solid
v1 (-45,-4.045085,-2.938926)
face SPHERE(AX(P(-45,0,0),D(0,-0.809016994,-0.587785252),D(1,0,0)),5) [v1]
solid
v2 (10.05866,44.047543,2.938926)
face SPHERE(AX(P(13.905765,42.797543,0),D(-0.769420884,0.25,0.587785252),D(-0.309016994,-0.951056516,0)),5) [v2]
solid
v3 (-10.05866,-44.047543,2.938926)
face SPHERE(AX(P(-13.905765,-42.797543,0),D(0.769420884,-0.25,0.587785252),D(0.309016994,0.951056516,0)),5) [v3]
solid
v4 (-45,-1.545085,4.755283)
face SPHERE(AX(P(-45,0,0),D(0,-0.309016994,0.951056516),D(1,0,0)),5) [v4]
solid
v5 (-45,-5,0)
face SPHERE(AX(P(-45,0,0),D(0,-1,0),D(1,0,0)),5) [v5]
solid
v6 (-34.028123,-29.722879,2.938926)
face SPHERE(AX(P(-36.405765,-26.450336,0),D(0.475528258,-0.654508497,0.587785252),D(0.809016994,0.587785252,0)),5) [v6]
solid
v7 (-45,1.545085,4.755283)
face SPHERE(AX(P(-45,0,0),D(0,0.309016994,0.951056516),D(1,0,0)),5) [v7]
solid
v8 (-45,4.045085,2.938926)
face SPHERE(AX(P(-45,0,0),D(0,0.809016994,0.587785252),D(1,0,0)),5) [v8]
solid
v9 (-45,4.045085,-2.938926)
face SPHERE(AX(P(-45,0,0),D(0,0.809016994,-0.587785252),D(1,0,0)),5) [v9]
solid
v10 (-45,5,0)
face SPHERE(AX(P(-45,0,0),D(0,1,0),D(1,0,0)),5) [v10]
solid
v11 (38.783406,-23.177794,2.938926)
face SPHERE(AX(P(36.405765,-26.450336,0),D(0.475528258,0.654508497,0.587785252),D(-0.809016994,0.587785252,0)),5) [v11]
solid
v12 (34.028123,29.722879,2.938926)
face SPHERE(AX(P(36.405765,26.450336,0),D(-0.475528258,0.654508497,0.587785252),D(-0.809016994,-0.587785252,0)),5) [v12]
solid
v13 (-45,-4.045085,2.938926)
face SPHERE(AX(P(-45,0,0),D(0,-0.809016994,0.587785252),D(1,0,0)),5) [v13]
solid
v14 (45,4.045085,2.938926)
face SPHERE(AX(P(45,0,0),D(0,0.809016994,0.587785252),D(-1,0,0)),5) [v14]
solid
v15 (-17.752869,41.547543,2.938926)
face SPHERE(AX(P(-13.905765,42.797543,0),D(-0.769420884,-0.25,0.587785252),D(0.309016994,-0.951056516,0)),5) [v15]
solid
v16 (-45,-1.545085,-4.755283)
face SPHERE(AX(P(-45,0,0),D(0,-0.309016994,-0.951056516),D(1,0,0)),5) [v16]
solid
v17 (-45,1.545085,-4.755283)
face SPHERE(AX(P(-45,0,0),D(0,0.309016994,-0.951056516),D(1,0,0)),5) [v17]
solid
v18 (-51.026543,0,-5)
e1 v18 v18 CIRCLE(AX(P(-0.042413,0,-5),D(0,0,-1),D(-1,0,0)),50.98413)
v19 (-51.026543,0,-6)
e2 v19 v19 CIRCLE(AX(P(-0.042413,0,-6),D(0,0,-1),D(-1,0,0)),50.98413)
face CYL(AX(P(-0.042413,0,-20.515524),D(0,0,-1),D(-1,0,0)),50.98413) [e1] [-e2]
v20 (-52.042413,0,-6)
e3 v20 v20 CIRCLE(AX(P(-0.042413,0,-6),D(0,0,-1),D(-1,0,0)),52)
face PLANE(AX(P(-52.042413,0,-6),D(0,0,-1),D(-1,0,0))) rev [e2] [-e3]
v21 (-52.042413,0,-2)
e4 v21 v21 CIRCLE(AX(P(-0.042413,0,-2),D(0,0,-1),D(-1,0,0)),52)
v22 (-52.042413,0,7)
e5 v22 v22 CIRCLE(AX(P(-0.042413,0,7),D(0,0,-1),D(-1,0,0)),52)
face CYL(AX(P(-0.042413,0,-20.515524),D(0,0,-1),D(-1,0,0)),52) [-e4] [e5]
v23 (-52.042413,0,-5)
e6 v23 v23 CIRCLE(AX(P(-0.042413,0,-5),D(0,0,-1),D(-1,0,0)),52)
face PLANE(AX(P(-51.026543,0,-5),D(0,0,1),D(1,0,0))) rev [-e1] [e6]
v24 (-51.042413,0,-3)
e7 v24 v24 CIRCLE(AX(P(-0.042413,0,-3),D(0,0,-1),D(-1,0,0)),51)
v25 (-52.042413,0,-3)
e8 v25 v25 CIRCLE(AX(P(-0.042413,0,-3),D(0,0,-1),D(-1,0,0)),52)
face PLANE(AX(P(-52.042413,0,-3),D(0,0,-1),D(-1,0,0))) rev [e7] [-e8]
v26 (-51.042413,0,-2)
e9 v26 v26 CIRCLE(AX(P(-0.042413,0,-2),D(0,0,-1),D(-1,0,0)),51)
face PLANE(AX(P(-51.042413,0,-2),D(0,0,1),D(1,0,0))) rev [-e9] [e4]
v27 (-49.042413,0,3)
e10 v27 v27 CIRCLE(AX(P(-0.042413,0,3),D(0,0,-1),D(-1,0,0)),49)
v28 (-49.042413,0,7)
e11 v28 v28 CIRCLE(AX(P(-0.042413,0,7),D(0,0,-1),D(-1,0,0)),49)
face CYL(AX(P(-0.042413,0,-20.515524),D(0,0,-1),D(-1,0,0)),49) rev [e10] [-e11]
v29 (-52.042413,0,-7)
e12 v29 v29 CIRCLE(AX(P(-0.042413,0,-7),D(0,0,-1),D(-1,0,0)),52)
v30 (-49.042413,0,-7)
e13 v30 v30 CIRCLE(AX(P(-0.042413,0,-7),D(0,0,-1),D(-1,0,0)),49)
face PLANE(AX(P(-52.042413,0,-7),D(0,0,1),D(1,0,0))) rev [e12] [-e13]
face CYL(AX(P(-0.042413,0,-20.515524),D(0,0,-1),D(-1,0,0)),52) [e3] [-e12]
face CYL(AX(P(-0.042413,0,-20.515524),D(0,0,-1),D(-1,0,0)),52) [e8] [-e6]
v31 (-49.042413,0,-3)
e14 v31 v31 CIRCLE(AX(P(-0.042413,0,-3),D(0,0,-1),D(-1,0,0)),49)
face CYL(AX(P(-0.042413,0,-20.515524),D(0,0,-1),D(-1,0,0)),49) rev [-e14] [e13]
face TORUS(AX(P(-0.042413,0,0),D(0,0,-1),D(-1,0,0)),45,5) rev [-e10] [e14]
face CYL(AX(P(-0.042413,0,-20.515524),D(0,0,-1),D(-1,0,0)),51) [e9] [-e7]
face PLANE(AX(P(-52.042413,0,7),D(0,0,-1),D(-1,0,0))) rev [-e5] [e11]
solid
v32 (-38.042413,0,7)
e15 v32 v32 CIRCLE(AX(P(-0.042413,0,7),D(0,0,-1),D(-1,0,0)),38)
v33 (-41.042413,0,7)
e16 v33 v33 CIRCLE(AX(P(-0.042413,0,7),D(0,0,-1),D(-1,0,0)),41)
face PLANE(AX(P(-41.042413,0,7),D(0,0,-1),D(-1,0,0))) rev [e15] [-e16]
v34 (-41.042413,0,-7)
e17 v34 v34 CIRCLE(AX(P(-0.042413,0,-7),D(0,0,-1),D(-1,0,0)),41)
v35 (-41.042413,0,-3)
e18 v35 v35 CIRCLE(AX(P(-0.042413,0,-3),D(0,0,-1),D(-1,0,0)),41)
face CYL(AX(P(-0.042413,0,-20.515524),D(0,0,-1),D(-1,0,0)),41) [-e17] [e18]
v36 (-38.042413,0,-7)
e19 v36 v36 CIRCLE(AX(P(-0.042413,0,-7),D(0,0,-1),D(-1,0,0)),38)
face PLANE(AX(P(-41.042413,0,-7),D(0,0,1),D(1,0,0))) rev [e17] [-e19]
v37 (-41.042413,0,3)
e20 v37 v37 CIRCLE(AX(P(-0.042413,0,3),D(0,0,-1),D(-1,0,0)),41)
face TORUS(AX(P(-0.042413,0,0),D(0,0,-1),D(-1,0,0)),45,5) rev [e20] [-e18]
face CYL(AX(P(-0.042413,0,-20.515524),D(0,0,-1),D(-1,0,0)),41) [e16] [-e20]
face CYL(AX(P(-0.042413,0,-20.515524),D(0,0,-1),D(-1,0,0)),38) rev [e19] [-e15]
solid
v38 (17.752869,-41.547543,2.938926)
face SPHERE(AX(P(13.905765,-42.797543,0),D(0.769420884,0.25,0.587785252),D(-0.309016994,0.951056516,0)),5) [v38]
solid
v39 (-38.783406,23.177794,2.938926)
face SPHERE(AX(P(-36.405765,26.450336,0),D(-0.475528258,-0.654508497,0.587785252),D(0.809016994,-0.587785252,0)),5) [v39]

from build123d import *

# Parameters (mm, degrees)
CIRPATTERN1_COUNT   = 10
CIRPATTERN2_ANGLE   = 180
CIRPATTERN2_2_ANGLE = 180
CIRPATTERN2_3_ANGLE = 180
CIRPATTERN2_4_ANGLE = 180
CIRPATTERN2_5_ANGLE = 180
CIRPATTERN2_6_ANGLE = 180
CIRPATTERN2_7_ANGLE = 180
CIRPATTERN2_8_ANGLE = 180
CIRPATTERN2_9_ANGLE = 180


with BuildPart() as part:
    # Sketch2 → Revolve1 (revolve)
    with BuildSketch(Plane.XZ):
        with BuildLine():
            Line((-52.042412723, -7), (-49.042412723, -7))
            Line((-49.042412723, -7), (-49.042412723, -3))
            ThreePointArc((-49.042412723, -3), (-50.042412723, 0), (-49.042412723, 3))
            Line((-49.042412723, 3), (-49.042412723, 7))
            Line((-49.042412723, 7), (-52.042412723, 7))
            Line((-52.042412723, 7), (-52.042412723, -2))
            Line((-52.042412723, -2), (-51.042412723, -2))
            Line((-51.042412723, -2), (-51.042412723, -3))
            Line((-51.042412723, -3), (-52.042412723, -3))
            Line((-52.042412723, -3), (-52.042412723, -5))
            Line((-52.042412723, -5), (-51.026542885, -5))
            Line((-51.026542885, -5), (-51.026542885, -6))
            Line((-51.026542885, -6), (-52.042412723, -6))
            Line((-52.042412723, -6), (-52.042412723, -7))
        make_face()
        with BuildLine():
            Line((-38.042412723, -7), (-38.042412723, 7))
            Line((-38.042412723, 7), (-41.042412723, 7))
            Line((-41.042412723, 7), (-41.042412723, 3))
            ThreePointArc((-41.042412723, 3), (-40.042412723, 0), (-41.042412723, -3))
            Line((-41.042412723, -3), (-41.042412723, -7))
            Line((-41.042412723, -7), (-38.042412723, -7))
        make_face()
    revolve(axis=Axis((-0.042412723, 0, -20.515524483), (0, 0, 1)))


with BuildPart() as body_2:
    # Sketch3 → Revolve2 (revolve)
    with BuildSketch(Plane.XY):
        with BuildLine():
            Line((-45, 5), (-45, -5))
            ThreePointArc((-45, -5), (-40, 0), (-45, 5))
        make_face()
    revolve(axis=Axis((-45, 42.158378663, 0), (0, -1, 0)))


with BuildPart() as cirpattern1_1:
    # CirPattern1: pattern copy
    add(body_2.part.rotate(Axis((-19.44032735, 0, 0), (1, 0, 0)), 1 * 360 / CIRPATTERN1_COUNT))


with BuildPart() as cirpattern1_2:
    # CirPattern1: pattern copy
    add(body_2.part.rotate(Axis((-19.44032735, 0, 0), (1, 0, 0)), 2 * 360 / CIRPATTERN1_COUNT))


with BuildPart() as cirpattern1_3:
    # CirPattern1: pattern copy
    add(body_2.part.rotate(Axis((-19.44032735, 0, 0), (1, 0, 0)), 3 * 360 / CIRPATTERN1_COUNT))


with BuildPart() as cirpattern1_4:
    # CirPattern1: pattern copy
    add(body_2.part.rotate(Axis((-19.44032735, 0, 0), (1, 0, 0)), 4 * 360 / CIRPATTERN1_COUNT))


with BuildPart() as cirpattern1_5:
    # CirPattern1: pattern copy
    add(body_2.part.rotate(Axis((-19.44032735, 0, 0), (1, 0, 0)), 5 * 360 / CIRPATTERN1_COUNT))


with BuildPart() as cirpattern1_6:
    # CirPattern1: pattern copy
    add(body_2.part.rotate(Axis((-19.44032735, 0, 0), (1, 0, 0)), 6 * 360 / CIRPATTERN1_COUNT))


with BuildPart() as cirpattern1_7:
    # CirPattern1: pattern copy
    add(body_2.part.rotate(Axis((-19.44032735, 0, 0), (1, 0, 0)), 7 * 360 / CIRPATTERN1_COUNT))


with BuildPart() as cirpattern1_8:
    # CirPattern1: pattern copy
    add(body_2.part.rotate(Axis((-19.44032735, 0, 0), (1, 0, 0)), 8 * 360 / CIRPATTERN1_COUNT))


with BuildPart() as cirpattern1_9:
    # CirPattern1: pattern copy
    add(body_2.part.rotate(Axis((-19.44032735, 0, 0), (1, 0, 0)), 9 * 360 / CIRPATTERN1_COUNT))


with BuildPart() as body_12:
    # CirPattern2: read off the stored shape, not the designer's step
    # CirPattern2: copy of body 2
    add(body_2.part.rotate(Axis((0, 0, 0), (0.9510565163, 0.3090169944, 0)), CIRPATTERN2_ANGLE))


with BuildPart() as body_13:
    # CirPattern2 2: copy of body 2
    add(body_2.part.rotate(Axis((0, 0, 0), (0.8090169944, 0.5877852523, 0)), CIRPATTERN2_2_ANGLE))


with BuildPart() as body_14:
    # CirPattern2 3: copy of body 2
    add(body_2.part.rotate(Axis((0, 0, 0), (0.5877852523, 0.8090169944, 0)), CIRPATTERN2_3_ANGLE))


with BuildPart() as body_15:
    # CirPattern2 4: copy of body 2
    add(body_2.part.rotate(Axis((0, 0, 0), (0.3090169944, 0.9510565163, 0)), CIRPATTERN2_4_ANGLE))


with BuildPart() as body_16:
    # CirPattern2 5: copy of body 2
    add(body_2.part.rotate(Axis((0, 0, 0), (0, 1, 0)), CIRPATTERN2_5_ANGLE))


with BuildPart() as body_17:
    # CirPattern2 6: copy of body 2
    add(body_2.part.rotate(Axis((0, 0, 0), (0.3090169944, -0.9510565163, 0)), CIRPATTERN2_6_ANGLE))


with BuildPart() as body_18:
    # CirPattern2 7: copy of body 2
    add(body_2.part.rotate(Axis((0, 0, 0), (0.5877852523, -0.8090169944, 0)), CIRPATTERN2_7_ANGLE))


with BuildPart() as body_19:
    # CirPattern2 8: copy of body 2
    add(body_2.part.rotate(Axis((0, 0, 0), (0.8090169944, -0.5877852523, 0)), CIRPATTERN2_8_ANGLE))


with BuildPart() as body_20:
    # CirPattern2 9: copy of body 2
    add(body_2.part.rotate(Axis((0, 0, 0), (0.9510565163, -0.3090169944, 0)), CIRPATTERN2_9_ANGLE))


solid = Compound([part.part, body_2.part, cirpattern1_1.part, cirpattern1_2.part, cirpattern1_3.part, cirpattern1_4.part, cirpattern1_5.part, cirpattern1_6.part, cirpattern1_7.part, cirpattern1_8.part, cirpattern1_9.part, body_12.part, body_13.part, body_14.part, body_15.part, body_16.part, body_17.part, body_18.part, body_19.part, body_20.part])
